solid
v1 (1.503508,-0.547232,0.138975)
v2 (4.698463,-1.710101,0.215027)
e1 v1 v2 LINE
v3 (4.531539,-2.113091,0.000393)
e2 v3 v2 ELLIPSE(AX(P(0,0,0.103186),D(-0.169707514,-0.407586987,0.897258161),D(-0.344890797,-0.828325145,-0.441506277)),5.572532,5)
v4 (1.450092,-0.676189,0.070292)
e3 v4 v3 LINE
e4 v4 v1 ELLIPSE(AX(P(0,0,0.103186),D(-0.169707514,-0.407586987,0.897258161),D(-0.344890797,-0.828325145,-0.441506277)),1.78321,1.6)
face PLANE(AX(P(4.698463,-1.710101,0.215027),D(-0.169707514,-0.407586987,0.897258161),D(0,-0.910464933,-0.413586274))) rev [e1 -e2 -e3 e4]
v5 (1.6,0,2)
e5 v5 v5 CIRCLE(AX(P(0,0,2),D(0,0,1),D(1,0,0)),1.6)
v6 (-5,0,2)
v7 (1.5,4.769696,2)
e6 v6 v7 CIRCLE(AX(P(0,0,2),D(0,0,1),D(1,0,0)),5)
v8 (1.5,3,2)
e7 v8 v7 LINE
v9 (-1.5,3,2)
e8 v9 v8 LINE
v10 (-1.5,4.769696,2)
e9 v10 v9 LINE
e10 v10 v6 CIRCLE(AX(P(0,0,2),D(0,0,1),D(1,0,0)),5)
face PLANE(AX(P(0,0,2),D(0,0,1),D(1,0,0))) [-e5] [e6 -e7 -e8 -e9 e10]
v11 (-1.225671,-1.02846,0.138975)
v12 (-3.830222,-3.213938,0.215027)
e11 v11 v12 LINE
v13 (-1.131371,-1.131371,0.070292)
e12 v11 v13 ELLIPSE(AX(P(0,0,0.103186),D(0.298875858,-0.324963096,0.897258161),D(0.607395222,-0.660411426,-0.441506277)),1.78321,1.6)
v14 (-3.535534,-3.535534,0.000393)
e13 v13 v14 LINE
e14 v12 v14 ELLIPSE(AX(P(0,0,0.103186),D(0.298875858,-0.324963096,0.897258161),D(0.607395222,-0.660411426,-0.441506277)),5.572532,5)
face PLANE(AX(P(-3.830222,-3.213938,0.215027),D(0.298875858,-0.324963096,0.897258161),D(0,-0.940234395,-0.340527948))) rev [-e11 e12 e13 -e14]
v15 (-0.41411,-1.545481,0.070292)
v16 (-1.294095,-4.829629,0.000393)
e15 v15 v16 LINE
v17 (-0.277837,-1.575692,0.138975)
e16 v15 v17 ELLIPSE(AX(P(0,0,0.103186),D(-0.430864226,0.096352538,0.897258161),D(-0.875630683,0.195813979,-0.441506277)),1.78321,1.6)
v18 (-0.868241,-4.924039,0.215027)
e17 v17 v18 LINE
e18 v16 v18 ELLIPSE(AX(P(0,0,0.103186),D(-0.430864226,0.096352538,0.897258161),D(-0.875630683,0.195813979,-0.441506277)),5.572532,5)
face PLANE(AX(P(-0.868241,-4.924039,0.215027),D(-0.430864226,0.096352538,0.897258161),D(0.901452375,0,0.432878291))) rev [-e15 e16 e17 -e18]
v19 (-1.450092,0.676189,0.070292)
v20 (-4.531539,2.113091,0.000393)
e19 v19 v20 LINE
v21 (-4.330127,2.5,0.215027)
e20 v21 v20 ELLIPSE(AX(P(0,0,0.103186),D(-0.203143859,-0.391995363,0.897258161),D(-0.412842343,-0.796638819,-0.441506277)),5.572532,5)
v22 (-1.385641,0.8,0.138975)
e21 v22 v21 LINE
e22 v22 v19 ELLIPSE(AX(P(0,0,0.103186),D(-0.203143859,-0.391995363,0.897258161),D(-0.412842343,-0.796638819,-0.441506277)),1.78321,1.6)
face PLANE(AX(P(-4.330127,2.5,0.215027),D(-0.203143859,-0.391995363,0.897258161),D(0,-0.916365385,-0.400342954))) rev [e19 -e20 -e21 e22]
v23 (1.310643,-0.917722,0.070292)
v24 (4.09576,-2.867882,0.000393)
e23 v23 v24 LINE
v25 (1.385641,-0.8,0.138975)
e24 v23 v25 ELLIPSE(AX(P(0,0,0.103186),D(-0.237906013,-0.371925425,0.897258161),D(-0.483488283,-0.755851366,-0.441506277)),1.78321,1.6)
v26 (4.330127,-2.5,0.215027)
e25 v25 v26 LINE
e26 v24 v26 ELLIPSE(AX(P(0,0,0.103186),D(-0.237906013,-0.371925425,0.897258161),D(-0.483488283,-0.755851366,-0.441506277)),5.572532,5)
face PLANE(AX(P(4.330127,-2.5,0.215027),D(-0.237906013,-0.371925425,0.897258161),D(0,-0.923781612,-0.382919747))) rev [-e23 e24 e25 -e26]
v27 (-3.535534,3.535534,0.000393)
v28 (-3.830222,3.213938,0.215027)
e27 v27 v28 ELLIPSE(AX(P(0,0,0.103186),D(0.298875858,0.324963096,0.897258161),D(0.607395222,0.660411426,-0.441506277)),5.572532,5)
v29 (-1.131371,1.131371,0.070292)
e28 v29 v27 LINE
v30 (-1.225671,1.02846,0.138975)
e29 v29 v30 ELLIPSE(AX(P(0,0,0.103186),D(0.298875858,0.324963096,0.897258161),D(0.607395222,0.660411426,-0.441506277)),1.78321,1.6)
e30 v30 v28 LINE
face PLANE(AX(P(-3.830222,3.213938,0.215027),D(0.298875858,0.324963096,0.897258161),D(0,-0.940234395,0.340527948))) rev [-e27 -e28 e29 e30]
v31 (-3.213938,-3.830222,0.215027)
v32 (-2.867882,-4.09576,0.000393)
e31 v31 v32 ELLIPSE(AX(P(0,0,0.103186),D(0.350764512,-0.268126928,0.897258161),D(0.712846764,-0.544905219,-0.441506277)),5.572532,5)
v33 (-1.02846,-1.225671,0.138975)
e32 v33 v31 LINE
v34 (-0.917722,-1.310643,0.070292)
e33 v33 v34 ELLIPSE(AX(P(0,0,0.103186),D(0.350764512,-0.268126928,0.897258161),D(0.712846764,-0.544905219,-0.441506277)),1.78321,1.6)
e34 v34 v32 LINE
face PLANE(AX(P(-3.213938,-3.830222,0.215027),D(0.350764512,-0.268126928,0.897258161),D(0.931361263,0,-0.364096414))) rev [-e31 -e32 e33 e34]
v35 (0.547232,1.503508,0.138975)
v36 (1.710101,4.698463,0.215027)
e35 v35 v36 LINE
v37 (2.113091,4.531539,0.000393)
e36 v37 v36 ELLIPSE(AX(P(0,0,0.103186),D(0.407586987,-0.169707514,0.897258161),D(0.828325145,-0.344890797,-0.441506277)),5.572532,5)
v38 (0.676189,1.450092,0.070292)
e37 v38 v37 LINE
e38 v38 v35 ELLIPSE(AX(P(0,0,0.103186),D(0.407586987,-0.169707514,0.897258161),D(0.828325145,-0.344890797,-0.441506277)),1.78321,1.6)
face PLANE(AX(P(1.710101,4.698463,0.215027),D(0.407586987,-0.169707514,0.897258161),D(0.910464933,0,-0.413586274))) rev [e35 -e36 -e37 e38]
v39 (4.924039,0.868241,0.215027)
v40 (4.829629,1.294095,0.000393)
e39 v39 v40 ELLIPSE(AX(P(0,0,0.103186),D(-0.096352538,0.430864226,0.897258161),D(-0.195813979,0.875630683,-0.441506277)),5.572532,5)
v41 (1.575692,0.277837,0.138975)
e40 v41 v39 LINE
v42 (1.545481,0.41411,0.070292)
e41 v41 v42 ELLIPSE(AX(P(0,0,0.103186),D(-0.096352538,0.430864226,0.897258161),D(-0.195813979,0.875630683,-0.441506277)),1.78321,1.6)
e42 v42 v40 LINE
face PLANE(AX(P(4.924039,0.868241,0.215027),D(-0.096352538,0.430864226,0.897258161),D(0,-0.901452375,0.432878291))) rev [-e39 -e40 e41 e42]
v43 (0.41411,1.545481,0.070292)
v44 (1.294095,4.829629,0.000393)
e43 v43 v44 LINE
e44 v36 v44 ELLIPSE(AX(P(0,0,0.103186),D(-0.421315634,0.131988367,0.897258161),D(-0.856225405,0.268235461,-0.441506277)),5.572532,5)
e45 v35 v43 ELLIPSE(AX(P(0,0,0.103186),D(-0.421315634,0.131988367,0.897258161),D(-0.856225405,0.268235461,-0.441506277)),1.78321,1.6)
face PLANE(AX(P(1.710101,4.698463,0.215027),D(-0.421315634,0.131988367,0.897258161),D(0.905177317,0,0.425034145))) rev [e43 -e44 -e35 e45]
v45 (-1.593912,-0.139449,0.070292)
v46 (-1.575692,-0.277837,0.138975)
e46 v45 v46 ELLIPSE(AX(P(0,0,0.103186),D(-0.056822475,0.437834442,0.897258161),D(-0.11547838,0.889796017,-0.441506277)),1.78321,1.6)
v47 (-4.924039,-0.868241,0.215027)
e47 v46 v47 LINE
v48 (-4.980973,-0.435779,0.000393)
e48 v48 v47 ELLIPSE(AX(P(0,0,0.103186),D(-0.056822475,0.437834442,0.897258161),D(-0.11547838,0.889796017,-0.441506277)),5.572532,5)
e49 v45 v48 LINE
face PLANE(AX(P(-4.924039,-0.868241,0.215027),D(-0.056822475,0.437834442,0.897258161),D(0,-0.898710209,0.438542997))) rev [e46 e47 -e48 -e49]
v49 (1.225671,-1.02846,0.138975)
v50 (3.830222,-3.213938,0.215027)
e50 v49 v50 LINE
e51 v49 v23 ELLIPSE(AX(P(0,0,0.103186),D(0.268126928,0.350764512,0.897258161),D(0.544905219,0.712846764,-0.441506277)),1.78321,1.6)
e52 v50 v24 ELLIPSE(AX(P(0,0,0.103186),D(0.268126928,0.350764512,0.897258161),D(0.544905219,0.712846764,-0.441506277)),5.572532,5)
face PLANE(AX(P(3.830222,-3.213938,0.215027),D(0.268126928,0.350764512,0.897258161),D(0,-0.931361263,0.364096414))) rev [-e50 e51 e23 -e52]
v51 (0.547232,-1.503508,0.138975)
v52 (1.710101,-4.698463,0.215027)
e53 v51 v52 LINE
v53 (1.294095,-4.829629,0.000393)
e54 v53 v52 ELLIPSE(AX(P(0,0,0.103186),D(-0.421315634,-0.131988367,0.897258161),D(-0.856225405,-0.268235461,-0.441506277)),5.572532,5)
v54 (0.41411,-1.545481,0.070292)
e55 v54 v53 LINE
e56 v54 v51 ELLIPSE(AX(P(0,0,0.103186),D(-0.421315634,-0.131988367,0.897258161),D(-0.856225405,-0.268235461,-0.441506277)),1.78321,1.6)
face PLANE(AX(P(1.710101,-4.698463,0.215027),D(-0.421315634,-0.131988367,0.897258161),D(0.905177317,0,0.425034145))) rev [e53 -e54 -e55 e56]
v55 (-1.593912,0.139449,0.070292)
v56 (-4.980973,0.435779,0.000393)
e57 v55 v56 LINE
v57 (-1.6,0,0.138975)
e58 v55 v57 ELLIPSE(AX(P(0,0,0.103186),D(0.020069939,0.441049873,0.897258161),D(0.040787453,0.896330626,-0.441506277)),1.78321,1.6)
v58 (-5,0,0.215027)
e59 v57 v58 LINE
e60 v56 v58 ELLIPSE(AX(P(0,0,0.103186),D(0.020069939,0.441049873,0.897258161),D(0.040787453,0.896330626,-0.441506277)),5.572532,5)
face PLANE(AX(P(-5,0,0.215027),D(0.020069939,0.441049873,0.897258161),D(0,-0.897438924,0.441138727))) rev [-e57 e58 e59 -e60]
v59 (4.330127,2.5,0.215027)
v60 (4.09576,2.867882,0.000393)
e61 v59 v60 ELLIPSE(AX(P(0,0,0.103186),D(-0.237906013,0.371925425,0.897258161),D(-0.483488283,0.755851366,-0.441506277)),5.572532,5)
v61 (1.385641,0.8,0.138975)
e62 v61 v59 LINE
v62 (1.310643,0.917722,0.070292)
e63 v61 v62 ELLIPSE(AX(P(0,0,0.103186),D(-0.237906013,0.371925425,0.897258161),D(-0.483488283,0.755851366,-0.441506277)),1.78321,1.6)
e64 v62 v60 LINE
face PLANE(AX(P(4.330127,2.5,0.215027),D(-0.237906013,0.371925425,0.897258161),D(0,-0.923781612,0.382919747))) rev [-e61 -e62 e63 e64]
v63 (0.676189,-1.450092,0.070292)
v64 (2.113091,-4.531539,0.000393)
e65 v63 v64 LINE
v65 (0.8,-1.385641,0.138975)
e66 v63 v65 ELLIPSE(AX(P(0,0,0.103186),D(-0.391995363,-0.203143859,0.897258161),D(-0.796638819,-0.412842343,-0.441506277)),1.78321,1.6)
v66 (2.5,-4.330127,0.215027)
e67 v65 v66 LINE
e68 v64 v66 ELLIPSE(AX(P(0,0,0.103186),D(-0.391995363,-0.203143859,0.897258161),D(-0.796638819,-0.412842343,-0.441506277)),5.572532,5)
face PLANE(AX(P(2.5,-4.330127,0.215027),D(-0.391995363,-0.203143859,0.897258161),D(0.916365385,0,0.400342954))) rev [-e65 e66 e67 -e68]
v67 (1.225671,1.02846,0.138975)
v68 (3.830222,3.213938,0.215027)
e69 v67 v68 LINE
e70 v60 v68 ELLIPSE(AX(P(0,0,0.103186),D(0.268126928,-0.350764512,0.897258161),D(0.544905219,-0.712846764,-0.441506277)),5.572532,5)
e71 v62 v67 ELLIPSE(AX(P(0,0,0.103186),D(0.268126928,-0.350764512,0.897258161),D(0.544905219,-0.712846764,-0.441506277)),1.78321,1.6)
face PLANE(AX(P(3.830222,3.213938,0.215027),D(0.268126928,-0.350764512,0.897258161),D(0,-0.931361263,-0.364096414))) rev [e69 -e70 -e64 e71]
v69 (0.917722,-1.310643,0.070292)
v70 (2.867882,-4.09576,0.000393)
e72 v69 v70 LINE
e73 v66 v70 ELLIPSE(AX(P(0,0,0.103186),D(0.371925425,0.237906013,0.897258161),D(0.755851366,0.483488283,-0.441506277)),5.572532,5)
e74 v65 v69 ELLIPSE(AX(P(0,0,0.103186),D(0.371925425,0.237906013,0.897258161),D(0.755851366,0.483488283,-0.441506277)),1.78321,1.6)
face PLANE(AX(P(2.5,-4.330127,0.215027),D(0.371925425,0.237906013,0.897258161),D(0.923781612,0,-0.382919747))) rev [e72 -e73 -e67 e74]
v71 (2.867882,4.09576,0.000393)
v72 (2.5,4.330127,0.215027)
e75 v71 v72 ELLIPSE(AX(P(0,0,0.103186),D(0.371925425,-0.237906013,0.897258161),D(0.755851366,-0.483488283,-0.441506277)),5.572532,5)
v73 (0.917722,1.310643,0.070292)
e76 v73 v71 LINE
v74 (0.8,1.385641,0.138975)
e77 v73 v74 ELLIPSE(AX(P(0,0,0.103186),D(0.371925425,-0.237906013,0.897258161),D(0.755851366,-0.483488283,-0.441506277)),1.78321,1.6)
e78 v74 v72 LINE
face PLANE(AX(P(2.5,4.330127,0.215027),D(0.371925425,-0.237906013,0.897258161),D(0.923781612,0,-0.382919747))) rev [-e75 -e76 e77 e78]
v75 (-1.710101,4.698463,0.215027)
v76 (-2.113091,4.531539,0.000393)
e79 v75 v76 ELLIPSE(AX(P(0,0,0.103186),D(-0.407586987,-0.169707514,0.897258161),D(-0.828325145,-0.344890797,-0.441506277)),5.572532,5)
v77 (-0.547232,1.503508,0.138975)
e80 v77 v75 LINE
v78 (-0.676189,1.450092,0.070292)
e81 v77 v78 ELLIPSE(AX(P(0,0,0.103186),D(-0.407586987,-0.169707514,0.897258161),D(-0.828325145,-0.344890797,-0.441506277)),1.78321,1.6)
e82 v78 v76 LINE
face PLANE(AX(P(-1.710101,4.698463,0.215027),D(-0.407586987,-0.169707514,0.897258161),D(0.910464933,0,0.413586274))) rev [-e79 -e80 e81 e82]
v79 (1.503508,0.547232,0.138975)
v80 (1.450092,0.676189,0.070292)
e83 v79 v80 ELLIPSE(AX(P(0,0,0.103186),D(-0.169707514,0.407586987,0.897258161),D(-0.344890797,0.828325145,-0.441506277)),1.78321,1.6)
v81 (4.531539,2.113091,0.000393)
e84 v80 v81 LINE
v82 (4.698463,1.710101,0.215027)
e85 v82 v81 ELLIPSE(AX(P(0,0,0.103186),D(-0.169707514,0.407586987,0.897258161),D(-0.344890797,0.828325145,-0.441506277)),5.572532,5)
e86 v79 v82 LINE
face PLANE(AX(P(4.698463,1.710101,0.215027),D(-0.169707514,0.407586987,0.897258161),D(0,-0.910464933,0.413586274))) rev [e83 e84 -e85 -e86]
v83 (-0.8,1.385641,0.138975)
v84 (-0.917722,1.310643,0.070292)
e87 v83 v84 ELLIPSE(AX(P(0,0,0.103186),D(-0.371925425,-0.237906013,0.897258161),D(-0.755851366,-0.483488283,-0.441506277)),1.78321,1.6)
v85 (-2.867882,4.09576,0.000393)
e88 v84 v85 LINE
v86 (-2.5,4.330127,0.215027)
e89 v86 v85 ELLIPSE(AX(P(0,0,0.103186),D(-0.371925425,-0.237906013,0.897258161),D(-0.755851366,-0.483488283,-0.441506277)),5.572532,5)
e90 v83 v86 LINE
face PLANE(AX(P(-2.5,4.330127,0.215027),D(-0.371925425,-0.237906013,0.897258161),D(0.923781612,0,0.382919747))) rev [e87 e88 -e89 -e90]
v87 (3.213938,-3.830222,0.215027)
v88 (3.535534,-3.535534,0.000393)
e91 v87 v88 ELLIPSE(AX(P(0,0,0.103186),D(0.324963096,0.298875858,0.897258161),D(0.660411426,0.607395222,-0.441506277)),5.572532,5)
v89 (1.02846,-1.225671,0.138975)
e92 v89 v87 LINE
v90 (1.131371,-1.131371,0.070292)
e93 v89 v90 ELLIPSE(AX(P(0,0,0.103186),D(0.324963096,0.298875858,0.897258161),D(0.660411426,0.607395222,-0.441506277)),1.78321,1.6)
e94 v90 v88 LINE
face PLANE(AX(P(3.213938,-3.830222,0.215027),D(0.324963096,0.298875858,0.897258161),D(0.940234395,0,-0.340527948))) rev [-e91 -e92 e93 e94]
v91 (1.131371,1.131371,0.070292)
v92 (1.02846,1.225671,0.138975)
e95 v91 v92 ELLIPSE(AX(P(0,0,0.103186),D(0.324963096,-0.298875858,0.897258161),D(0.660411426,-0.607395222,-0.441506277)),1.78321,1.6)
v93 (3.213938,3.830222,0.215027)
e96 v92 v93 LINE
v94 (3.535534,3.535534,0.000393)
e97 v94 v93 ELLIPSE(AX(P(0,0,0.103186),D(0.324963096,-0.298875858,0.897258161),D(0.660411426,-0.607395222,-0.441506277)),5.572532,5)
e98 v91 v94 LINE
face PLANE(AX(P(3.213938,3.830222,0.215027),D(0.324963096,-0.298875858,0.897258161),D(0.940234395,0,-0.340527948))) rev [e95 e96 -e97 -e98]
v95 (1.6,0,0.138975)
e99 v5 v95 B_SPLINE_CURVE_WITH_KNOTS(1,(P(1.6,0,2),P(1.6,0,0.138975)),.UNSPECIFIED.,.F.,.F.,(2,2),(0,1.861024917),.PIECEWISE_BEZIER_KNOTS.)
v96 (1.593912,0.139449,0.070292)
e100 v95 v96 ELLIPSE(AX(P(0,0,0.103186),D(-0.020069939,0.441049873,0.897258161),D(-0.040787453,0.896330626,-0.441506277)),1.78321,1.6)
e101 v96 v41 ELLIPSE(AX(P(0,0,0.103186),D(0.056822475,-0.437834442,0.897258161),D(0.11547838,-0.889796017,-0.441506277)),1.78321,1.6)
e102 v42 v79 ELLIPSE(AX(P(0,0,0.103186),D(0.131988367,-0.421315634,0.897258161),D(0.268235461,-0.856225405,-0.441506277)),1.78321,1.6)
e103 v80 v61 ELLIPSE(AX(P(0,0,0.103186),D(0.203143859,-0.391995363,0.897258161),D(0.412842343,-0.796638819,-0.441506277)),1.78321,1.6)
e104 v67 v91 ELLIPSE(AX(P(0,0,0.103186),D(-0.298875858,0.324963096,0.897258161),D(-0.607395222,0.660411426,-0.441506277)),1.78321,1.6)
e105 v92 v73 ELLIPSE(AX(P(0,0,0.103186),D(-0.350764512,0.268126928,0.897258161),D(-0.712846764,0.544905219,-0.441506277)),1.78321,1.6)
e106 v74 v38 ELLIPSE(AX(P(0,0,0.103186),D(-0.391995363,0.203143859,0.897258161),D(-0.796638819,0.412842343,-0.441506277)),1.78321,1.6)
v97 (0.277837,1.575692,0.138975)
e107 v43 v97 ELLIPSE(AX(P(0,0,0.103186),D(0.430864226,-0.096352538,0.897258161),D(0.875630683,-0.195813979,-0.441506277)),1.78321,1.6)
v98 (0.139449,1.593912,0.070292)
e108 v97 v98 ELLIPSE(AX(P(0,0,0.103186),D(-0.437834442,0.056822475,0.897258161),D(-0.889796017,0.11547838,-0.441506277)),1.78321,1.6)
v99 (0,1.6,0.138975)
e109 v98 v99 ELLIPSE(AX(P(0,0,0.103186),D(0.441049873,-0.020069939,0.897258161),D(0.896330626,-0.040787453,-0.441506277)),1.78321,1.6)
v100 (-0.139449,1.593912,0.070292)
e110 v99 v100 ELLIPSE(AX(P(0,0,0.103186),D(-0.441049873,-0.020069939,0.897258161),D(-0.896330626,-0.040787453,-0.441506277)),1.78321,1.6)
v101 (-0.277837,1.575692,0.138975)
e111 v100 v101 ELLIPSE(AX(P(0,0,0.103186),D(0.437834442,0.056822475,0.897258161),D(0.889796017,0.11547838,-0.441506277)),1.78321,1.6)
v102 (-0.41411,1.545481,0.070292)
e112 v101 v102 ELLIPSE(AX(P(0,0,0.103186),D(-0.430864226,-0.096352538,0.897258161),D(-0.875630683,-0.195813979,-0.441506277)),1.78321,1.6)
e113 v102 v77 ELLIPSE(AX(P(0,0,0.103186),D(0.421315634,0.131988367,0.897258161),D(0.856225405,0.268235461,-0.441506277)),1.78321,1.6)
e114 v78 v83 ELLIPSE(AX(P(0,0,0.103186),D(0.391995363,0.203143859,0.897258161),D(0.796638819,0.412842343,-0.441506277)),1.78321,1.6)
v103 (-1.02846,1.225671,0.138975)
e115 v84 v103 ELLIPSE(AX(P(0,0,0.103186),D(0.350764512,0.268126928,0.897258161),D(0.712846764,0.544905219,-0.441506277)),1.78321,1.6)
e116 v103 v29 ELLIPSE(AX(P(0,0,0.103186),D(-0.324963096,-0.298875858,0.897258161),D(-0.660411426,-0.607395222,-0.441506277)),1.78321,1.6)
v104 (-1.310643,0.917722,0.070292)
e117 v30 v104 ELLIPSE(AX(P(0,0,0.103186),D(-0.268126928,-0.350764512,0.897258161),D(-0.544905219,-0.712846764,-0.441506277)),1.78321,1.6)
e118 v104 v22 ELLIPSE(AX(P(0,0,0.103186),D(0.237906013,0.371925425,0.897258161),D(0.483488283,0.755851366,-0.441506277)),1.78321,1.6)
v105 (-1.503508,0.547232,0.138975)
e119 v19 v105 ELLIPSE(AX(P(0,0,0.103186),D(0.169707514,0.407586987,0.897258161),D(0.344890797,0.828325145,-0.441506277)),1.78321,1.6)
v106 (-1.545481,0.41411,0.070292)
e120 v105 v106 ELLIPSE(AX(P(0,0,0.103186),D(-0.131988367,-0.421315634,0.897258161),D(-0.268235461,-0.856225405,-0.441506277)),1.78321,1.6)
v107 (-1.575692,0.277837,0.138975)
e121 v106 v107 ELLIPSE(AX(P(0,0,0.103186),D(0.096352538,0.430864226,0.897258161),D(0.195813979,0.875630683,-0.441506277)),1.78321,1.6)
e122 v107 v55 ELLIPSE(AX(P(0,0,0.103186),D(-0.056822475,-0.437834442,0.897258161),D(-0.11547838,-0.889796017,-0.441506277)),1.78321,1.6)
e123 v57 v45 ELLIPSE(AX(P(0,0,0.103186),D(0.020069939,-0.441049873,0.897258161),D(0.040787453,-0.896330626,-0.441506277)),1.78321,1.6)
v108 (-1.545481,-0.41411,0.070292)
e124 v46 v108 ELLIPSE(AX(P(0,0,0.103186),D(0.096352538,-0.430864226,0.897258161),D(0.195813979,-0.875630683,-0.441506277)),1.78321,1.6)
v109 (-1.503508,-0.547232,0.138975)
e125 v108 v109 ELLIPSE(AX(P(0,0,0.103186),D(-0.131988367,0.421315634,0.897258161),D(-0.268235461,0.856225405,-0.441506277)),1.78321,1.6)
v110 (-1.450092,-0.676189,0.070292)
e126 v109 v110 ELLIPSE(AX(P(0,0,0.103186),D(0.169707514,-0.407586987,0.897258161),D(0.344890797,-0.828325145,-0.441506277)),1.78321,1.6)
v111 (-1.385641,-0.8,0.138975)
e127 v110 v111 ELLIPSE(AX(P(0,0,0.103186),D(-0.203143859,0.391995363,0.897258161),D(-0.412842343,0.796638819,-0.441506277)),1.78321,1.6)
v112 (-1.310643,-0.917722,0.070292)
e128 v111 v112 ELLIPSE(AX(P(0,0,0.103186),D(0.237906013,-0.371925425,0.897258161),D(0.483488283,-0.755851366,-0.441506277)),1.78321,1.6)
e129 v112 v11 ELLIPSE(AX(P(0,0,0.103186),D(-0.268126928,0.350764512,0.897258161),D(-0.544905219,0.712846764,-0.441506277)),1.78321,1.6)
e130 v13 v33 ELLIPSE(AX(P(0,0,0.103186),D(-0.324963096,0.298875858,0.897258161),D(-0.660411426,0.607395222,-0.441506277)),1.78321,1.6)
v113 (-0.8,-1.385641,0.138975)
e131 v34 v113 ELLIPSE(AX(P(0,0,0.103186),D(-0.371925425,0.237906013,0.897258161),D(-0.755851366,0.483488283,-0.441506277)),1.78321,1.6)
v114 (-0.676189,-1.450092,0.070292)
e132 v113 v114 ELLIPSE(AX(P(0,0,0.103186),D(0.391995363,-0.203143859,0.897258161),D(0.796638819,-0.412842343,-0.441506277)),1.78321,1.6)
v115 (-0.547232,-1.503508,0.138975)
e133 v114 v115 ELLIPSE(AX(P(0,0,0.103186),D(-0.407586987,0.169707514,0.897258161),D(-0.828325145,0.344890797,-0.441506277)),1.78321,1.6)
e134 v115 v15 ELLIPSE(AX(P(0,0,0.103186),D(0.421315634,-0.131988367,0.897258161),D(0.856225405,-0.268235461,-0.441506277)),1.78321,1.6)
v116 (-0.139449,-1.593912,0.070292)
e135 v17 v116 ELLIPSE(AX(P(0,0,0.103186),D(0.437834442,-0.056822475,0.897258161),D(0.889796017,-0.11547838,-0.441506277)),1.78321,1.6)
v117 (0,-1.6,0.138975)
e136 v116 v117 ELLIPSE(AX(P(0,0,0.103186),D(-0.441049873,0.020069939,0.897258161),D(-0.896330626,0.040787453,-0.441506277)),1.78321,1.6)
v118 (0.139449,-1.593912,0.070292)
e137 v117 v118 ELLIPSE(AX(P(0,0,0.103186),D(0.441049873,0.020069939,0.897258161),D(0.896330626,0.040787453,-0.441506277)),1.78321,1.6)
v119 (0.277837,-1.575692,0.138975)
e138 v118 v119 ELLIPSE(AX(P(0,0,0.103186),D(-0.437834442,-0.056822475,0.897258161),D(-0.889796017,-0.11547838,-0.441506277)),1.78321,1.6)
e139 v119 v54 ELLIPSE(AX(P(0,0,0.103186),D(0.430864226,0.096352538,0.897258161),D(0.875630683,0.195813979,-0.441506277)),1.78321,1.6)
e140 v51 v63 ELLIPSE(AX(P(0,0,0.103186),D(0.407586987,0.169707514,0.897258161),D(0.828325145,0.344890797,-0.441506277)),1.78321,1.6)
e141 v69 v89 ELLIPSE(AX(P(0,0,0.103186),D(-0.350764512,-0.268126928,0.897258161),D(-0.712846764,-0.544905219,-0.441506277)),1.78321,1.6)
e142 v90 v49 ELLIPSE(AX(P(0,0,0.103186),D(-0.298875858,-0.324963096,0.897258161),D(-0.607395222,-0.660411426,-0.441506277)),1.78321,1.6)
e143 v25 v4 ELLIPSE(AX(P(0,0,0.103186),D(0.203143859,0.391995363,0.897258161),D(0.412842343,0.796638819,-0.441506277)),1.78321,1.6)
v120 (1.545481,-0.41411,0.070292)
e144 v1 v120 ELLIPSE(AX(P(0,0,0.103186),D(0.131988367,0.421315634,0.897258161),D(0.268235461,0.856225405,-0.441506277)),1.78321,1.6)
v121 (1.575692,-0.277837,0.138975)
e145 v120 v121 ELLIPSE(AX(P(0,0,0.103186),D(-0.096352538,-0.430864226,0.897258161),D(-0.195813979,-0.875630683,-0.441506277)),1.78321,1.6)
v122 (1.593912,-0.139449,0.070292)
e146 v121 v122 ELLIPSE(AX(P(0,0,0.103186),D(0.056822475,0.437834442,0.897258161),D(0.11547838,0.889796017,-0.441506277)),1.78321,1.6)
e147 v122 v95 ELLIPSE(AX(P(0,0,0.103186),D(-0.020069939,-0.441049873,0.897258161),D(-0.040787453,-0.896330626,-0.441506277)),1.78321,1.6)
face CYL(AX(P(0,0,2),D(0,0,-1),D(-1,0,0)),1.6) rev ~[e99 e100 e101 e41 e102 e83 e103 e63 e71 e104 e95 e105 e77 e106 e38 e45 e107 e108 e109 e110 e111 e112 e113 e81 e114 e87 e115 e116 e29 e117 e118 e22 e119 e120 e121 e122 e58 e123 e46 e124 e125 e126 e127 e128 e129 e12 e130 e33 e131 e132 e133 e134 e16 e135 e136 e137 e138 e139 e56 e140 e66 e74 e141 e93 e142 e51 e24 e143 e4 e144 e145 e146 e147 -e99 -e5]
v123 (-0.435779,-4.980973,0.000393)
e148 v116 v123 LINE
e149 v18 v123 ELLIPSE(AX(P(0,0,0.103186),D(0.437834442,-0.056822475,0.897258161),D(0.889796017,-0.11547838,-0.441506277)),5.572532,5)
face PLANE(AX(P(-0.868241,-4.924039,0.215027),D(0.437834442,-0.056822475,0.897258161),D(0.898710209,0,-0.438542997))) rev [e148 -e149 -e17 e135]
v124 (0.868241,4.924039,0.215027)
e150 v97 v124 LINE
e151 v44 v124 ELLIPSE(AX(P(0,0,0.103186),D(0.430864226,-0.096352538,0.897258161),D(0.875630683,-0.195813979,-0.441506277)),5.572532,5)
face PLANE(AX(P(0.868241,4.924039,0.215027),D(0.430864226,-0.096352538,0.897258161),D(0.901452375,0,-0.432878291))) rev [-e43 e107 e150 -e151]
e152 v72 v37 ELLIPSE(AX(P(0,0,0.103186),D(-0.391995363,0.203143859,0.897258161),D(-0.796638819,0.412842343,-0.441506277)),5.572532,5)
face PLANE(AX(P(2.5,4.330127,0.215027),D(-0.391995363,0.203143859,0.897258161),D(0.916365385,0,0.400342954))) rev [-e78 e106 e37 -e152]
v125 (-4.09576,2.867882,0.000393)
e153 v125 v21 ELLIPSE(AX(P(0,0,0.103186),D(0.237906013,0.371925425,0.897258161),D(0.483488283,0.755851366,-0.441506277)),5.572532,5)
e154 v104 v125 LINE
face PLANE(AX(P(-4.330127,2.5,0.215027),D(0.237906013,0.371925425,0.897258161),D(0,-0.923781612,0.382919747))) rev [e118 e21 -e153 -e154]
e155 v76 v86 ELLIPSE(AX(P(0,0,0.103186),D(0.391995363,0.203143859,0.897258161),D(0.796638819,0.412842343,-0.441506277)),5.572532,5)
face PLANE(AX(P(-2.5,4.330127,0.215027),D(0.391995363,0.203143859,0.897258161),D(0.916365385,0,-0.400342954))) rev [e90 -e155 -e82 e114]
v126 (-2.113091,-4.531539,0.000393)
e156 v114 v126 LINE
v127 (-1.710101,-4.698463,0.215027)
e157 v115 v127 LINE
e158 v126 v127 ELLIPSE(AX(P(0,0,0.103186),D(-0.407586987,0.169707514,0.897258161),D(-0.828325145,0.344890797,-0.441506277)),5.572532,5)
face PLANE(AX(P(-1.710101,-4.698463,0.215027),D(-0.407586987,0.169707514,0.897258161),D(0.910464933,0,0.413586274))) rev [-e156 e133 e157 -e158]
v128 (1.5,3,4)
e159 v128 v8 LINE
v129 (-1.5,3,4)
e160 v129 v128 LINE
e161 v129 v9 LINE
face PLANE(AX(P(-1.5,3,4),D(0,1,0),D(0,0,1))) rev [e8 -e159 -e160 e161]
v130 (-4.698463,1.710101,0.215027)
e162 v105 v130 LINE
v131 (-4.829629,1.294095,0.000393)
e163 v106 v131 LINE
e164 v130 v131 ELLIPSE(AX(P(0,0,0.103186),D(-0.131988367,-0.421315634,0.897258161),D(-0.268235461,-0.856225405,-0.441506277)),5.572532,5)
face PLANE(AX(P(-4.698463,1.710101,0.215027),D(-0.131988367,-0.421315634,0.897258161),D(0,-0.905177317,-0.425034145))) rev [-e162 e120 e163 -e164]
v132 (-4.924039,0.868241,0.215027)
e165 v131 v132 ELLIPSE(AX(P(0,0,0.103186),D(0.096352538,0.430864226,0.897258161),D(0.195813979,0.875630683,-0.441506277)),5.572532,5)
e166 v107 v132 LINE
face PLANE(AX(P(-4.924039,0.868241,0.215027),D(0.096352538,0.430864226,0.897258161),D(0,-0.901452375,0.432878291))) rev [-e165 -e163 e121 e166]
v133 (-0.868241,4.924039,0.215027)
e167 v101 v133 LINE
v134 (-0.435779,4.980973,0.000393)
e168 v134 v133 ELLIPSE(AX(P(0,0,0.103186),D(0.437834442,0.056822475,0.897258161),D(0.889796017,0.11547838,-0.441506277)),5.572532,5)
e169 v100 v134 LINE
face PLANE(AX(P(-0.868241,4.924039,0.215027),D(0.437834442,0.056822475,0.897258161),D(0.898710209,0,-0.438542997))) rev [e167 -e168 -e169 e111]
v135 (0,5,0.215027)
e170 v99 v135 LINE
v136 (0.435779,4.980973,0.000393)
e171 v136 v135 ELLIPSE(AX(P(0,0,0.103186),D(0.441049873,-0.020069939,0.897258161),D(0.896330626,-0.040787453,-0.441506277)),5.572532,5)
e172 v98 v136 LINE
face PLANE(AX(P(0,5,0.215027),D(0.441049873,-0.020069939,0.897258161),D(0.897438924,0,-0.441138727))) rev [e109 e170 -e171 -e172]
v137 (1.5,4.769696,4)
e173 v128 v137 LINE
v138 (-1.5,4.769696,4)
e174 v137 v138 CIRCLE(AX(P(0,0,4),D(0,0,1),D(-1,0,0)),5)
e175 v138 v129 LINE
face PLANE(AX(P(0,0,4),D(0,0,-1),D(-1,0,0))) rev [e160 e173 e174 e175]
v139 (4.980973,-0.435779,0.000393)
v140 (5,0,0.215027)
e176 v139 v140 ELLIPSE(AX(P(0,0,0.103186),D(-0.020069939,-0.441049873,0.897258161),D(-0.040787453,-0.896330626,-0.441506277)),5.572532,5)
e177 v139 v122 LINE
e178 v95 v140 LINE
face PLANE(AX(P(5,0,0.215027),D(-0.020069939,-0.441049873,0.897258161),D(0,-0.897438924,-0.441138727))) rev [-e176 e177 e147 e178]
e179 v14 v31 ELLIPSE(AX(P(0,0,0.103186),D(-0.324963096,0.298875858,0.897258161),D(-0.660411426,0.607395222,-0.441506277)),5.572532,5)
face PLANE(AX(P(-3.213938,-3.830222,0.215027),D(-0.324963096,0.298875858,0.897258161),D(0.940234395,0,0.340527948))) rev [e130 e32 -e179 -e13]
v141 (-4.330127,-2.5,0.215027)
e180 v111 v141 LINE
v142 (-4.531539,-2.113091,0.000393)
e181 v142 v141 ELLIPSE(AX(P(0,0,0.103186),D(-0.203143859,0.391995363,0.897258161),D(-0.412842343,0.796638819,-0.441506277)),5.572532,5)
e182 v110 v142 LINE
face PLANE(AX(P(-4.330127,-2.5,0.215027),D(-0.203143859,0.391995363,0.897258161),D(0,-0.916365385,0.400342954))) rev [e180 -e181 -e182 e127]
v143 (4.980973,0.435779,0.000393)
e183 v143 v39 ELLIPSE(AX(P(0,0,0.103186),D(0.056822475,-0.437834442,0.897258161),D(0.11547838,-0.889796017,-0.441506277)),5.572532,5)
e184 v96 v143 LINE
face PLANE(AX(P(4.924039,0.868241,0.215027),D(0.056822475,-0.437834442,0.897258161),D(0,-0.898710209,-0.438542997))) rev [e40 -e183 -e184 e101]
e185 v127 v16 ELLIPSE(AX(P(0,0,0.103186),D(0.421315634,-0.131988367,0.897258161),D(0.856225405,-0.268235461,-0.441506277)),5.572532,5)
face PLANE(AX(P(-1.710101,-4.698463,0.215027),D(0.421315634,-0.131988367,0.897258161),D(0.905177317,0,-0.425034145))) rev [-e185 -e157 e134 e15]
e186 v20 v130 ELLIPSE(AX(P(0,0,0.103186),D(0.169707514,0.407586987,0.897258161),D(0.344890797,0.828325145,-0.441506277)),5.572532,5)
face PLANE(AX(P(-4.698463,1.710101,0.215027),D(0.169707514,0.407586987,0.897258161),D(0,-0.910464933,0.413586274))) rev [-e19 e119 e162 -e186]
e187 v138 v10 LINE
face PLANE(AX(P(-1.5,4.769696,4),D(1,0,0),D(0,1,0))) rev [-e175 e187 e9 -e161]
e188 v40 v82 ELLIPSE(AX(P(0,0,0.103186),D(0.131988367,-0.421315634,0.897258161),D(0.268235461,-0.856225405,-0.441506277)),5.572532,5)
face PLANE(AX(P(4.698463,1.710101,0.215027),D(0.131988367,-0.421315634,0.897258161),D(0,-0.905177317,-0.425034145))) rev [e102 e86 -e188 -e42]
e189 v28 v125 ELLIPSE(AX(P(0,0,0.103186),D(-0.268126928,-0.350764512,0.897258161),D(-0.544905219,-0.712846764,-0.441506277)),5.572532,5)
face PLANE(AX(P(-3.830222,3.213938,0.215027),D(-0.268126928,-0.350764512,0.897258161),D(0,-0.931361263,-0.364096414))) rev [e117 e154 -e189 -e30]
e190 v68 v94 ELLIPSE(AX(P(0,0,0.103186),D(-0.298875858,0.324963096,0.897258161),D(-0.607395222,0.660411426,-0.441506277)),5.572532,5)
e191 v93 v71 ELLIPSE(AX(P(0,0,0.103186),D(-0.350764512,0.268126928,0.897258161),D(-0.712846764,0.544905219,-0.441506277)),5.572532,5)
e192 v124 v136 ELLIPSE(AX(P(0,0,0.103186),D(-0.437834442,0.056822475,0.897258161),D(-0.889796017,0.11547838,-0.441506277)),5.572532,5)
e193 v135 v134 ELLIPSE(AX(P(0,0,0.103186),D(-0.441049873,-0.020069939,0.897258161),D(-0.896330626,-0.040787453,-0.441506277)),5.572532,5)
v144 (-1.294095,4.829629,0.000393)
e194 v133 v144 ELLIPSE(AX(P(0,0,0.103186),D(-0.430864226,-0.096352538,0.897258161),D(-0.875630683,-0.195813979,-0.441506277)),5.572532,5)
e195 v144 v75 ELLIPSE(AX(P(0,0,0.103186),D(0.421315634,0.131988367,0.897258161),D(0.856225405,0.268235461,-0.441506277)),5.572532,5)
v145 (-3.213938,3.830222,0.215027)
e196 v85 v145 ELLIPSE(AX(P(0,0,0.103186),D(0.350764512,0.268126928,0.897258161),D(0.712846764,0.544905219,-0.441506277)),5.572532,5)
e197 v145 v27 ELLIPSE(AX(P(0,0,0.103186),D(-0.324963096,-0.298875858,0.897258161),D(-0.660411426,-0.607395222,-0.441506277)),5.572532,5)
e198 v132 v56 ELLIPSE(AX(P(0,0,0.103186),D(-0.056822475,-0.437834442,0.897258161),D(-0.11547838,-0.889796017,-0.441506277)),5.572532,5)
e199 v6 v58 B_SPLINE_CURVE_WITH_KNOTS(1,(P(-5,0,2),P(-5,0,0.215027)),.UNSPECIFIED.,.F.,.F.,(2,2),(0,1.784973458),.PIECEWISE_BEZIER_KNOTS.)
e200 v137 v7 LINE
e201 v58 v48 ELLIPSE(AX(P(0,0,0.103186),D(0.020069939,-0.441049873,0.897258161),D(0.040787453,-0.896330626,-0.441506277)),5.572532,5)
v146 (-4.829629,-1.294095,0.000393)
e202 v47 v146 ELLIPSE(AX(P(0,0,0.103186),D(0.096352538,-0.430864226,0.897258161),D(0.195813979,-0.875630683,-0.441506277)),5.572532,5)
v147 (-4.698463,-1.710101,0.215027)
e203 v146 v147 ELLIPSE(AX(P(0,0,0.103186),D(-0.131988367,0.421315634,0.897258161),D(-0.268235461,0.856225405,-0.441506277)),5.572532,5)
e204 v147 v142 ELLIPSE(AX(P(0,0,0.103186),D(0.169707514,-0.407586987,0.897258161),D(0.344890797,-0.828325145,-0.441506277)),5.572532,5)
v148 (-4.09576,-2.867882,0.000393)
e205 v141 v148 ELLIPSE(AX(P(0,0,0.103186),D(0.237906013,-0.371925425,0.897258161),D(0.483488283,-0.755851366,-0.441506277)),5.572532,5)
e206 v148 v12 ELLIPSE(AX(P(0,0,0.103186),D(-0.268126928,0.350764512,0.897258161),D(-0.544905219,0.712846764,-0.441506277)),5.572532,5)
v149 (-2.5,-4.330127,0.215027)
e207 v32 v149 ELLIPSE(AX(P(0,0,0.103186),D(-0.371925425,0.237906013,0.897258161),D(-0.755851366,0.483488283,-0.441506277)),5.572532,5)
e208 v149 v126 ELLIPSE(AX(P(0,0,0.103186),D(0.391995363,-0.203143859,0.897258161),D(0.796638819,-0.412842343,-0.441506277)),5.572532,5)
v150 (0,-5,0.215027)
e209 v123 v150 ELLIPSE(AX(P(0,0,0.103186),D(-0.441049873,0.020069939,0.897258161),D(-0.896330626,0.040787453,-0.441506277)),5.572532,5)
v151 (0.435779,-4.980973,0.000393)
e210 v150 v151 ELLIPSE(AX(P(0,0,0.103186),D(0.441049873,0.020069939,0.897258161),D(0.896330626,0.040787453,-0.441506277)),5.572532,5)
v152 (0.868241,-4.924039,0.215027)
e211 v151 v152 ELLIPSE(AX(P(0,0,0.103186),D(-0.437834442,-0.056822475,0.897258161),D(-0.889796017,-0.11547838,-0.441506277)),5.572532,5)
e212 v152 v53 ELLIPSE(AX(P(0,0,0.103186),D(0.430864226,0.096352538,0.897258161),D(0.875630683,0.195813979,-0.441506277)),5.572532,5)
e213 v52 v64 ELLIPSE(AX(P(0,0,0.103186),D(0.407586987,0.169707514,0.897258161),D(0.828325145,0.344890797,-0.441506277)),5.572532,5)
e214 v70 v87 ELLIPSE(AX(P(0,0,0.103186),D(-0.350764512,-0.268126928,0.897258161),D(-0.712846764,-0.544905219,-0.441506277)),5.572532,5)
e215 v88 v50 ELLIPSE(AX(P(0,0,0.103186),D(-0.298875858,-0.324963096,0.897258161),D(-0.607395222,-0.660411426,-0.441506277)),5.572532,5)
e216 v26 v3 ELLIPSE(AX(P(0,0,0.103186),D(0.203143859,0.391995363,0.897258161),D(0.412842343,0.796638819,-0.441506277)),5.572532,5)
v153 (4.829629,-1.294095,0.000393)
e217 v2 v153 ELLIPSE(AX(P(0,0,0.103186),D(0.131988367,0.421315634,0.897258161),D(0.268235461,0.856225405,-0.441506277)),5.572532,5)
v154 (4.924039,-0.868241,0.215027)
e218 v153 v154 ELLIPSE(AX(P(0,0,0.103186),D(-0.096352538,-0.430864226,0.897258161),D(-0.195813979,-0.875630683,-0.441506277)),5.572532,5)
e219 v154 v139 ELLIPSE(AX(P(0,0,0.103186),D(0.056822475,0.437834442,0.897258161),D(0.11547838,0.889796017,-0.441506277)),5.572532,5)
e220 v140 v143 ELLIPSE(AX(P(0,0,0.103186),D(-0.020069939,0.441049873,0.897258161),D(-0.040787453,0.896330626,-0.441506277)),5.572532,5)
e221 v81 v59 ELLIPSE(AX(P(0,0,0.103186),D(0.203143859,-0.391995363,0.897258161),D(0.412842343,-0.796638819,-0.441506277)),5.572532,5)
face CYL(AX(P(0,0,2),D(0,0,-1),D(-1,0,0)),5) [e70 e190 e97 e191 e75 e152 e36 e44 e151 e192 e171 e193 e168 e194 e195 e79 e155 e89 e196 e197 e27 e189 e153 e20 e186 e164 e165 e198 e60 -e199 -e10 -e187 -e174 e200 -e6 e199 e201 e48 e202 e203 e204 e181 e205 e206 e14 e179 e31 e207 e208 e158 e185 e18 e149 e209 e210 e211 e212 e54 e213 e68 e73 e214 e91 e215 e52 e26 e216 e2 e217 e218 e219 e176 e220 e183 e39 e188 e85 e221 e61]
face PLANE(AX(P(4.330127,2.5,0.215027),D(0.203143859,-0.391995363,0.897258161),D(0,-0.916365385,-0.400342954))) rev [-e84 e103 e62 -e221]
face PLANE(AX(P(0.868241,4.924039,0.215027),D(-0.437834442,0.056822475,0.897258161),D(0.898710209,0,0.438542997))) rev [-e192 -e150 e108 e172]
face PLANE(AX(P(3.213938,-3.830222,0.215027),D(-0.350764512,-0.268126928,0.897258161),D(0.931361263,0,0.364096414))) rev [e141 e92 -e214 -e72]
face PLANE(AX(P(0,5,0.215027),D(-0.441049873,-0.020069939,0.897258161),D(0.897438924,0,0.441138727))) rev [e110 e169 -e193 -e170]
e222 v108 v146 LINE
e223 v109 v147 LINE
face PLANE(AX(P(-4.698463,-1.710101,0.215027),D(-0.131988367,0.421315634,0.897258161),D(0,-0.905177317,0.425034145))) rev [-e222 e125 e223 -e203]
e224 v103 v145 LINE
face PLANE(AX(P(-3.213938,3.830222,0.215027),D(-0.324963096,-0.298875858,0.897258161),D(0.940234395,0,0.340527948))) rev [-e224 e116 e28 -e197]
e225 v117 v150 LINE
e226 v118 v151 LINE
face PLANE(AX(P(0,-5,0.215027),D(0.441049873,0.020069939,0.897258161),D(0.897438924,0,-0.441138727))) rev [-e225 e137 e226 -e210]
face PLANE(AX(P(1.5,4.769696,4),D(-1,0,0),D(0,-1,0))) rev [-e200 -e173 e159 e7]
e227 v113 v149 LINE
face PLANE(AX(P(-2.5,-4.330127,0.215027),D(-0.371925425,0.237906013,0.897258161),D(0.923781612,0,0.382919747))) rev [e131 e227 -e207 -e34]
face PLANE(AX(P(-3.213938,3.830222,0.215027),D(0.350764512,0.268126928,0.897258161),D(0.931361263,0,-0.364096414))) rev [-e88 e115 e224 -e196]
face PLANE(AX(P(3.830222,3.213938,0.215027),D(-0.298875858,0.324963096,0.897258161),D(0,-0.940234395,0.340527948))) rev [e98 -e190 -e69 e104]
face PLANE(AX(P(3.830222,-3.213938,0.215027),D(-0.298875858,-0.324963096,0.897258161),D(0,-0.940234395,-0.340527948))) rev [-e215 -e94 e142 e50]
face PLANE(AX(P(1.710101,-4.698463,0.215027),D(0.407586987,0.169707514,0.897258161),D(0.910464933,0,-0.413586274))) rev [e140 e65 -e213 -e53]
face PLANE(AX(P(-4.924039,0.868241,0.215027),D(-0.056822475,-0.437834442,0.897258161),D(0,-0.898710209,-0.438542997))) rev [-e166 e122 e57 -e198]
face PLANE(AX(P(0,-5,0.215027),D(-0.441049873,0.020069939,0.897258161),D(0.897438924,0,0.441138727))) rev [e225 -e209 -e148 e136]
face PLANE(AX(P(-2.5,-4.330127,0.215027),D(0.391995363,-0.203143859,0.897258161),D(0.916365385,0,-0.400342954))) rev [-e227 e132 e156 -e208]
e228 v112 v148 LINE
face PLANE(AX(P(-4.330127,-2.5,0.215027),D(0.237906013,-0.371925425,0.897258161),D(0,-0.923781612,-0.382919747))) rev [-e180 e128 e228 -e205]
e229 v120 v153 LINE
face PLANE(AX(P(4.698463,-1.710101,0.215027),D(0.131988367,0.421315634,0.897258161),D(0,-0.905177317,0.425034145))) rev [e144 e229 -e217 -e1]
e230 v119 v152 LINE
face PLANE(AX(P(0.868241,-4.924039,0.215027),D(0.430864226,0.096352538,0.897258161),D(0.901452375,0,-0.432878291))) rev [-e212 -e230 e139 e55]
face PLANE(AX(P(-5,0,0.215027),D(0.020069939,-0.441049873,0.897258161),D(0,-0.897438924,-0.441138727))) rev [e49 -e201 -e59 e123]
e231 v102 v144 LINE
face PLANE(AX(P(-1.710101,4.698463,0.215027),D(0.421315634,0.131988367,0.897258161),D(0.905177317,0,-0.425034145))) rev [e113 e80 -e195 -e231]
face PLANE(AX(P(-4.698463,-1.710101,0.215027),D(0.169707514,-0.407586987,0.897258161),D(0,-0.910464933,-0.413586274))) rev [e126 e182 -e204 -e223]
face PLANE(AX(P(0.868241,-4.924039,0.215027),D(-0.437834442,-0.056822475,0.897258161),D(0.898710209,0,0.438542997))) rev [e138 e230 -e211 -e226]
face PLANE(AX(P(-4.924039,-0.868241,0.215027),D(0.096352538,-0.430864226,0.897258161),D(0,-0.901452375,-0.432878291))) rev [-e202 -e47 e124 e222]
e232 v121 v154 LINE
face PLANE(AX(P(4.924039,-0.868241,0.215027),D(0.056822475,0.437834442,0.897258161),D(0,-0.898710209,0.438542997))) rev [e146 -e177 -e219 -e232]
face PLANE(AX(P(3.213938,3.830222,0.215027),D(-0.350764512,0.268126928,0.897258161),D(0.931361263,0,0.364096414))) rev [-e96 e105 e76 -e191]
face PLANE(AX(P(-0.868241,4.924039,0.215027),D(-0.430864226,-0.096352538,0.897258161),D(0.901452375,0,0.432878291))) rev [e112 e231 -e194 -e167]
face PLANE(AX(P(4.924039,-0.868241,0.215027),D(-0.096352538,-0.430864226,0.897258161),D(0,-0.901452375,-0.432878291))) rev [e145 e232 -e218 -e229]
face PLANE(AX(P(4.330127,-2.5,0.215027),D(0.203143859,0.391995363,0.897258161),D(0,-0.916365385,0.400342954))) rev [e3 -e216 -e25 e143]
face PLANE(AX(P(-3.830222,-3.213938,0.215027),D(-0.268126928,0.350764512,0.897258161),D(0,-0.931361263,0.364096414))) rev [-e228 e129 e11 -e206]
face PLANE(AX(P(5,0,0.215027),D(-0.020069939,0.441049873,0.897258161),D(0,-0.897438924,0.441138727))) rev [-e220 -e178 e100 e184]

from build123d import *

# Parameters (mm, degrees)
SKETCH_1_R               = 5
SKETCH_1_R_2             = 1.6
EXTRUDE_1_DEPTH          = 2
EXTRUDE_2_DEPTH          = 2
CUT_EXTRUDE_START        = 1.574632158
CUT_EXTRUDE_1_DEPTH      = 3.428926011
PATTERN_CIRCULAR_1_COUNT = 36


# Read off the part's stored shape, not the designer's step: 切除-拉伸1
with BuildPart() as part:
    # 草图1 → 凸台-拉伸1 (new body)
    with BuildSketch(Plane.XY):
        Circle(SKETCH_1_R)
        Circle(SKETCH_1_R_2, mode=Mode.SUBTRACT)
    extrude(amount=EXTRUDE_1_DEPTH)

    # 草图2 → 凸台-拉伸2 (add)
    with BuildSketch(Plane.XY.offset(2)):
        with BuildLine():
            Line((-1.5, 4.769696007), (-1.5, 3))
            Line((-1.5, 3), (1.5, 3))
            Line((1.5, 3), (1.5, 4.769696007))
            ThreePointArc((1.5, 4.769696007), (0, 5), (-1.5, 4.769696007))
        make_face()
    extrude(amount=EXTRUDE_2_DEPTH)

    # 切除-拉伸1 outline → 切除-拉伸1 (cut)
    with BuildSketch(Plane(origin=(0, 0, 0), x_dir=(0, 1, 0), z_dir=(0.9997499284218206, 0, 0.022362482432963404)).offset(CUT_EXTRUDE_START)):
        Polygon((0.436574347, -0.111385374), (0, 0.103160358), (-0.436574347, -0.111385374), (-2, -0.879699645), (-2, -2), (2, -2), (2, -0.879699645), align=None)
    cut_extrude_1 = extrude(amount=CUT_EXTRUDE_1_DEPTH, mode=Mode.SUBTRACT)

    # 阵列(圆周)1: 切除-拉伸1 ×36 about axis
    pattern_circular_1_axis = Axis((0, 0, 0), (0, 0, 1))
    for i in range(1, PATTERN_CIRCULAR_1_COUNT):
        add(cut_extrude_1.rotate(pattern_circular_1_axis, i * 360 / PATTERN_CIRCULAR_1_COUNT), mode=Mode.SUBTRACT)


solid = part.part
